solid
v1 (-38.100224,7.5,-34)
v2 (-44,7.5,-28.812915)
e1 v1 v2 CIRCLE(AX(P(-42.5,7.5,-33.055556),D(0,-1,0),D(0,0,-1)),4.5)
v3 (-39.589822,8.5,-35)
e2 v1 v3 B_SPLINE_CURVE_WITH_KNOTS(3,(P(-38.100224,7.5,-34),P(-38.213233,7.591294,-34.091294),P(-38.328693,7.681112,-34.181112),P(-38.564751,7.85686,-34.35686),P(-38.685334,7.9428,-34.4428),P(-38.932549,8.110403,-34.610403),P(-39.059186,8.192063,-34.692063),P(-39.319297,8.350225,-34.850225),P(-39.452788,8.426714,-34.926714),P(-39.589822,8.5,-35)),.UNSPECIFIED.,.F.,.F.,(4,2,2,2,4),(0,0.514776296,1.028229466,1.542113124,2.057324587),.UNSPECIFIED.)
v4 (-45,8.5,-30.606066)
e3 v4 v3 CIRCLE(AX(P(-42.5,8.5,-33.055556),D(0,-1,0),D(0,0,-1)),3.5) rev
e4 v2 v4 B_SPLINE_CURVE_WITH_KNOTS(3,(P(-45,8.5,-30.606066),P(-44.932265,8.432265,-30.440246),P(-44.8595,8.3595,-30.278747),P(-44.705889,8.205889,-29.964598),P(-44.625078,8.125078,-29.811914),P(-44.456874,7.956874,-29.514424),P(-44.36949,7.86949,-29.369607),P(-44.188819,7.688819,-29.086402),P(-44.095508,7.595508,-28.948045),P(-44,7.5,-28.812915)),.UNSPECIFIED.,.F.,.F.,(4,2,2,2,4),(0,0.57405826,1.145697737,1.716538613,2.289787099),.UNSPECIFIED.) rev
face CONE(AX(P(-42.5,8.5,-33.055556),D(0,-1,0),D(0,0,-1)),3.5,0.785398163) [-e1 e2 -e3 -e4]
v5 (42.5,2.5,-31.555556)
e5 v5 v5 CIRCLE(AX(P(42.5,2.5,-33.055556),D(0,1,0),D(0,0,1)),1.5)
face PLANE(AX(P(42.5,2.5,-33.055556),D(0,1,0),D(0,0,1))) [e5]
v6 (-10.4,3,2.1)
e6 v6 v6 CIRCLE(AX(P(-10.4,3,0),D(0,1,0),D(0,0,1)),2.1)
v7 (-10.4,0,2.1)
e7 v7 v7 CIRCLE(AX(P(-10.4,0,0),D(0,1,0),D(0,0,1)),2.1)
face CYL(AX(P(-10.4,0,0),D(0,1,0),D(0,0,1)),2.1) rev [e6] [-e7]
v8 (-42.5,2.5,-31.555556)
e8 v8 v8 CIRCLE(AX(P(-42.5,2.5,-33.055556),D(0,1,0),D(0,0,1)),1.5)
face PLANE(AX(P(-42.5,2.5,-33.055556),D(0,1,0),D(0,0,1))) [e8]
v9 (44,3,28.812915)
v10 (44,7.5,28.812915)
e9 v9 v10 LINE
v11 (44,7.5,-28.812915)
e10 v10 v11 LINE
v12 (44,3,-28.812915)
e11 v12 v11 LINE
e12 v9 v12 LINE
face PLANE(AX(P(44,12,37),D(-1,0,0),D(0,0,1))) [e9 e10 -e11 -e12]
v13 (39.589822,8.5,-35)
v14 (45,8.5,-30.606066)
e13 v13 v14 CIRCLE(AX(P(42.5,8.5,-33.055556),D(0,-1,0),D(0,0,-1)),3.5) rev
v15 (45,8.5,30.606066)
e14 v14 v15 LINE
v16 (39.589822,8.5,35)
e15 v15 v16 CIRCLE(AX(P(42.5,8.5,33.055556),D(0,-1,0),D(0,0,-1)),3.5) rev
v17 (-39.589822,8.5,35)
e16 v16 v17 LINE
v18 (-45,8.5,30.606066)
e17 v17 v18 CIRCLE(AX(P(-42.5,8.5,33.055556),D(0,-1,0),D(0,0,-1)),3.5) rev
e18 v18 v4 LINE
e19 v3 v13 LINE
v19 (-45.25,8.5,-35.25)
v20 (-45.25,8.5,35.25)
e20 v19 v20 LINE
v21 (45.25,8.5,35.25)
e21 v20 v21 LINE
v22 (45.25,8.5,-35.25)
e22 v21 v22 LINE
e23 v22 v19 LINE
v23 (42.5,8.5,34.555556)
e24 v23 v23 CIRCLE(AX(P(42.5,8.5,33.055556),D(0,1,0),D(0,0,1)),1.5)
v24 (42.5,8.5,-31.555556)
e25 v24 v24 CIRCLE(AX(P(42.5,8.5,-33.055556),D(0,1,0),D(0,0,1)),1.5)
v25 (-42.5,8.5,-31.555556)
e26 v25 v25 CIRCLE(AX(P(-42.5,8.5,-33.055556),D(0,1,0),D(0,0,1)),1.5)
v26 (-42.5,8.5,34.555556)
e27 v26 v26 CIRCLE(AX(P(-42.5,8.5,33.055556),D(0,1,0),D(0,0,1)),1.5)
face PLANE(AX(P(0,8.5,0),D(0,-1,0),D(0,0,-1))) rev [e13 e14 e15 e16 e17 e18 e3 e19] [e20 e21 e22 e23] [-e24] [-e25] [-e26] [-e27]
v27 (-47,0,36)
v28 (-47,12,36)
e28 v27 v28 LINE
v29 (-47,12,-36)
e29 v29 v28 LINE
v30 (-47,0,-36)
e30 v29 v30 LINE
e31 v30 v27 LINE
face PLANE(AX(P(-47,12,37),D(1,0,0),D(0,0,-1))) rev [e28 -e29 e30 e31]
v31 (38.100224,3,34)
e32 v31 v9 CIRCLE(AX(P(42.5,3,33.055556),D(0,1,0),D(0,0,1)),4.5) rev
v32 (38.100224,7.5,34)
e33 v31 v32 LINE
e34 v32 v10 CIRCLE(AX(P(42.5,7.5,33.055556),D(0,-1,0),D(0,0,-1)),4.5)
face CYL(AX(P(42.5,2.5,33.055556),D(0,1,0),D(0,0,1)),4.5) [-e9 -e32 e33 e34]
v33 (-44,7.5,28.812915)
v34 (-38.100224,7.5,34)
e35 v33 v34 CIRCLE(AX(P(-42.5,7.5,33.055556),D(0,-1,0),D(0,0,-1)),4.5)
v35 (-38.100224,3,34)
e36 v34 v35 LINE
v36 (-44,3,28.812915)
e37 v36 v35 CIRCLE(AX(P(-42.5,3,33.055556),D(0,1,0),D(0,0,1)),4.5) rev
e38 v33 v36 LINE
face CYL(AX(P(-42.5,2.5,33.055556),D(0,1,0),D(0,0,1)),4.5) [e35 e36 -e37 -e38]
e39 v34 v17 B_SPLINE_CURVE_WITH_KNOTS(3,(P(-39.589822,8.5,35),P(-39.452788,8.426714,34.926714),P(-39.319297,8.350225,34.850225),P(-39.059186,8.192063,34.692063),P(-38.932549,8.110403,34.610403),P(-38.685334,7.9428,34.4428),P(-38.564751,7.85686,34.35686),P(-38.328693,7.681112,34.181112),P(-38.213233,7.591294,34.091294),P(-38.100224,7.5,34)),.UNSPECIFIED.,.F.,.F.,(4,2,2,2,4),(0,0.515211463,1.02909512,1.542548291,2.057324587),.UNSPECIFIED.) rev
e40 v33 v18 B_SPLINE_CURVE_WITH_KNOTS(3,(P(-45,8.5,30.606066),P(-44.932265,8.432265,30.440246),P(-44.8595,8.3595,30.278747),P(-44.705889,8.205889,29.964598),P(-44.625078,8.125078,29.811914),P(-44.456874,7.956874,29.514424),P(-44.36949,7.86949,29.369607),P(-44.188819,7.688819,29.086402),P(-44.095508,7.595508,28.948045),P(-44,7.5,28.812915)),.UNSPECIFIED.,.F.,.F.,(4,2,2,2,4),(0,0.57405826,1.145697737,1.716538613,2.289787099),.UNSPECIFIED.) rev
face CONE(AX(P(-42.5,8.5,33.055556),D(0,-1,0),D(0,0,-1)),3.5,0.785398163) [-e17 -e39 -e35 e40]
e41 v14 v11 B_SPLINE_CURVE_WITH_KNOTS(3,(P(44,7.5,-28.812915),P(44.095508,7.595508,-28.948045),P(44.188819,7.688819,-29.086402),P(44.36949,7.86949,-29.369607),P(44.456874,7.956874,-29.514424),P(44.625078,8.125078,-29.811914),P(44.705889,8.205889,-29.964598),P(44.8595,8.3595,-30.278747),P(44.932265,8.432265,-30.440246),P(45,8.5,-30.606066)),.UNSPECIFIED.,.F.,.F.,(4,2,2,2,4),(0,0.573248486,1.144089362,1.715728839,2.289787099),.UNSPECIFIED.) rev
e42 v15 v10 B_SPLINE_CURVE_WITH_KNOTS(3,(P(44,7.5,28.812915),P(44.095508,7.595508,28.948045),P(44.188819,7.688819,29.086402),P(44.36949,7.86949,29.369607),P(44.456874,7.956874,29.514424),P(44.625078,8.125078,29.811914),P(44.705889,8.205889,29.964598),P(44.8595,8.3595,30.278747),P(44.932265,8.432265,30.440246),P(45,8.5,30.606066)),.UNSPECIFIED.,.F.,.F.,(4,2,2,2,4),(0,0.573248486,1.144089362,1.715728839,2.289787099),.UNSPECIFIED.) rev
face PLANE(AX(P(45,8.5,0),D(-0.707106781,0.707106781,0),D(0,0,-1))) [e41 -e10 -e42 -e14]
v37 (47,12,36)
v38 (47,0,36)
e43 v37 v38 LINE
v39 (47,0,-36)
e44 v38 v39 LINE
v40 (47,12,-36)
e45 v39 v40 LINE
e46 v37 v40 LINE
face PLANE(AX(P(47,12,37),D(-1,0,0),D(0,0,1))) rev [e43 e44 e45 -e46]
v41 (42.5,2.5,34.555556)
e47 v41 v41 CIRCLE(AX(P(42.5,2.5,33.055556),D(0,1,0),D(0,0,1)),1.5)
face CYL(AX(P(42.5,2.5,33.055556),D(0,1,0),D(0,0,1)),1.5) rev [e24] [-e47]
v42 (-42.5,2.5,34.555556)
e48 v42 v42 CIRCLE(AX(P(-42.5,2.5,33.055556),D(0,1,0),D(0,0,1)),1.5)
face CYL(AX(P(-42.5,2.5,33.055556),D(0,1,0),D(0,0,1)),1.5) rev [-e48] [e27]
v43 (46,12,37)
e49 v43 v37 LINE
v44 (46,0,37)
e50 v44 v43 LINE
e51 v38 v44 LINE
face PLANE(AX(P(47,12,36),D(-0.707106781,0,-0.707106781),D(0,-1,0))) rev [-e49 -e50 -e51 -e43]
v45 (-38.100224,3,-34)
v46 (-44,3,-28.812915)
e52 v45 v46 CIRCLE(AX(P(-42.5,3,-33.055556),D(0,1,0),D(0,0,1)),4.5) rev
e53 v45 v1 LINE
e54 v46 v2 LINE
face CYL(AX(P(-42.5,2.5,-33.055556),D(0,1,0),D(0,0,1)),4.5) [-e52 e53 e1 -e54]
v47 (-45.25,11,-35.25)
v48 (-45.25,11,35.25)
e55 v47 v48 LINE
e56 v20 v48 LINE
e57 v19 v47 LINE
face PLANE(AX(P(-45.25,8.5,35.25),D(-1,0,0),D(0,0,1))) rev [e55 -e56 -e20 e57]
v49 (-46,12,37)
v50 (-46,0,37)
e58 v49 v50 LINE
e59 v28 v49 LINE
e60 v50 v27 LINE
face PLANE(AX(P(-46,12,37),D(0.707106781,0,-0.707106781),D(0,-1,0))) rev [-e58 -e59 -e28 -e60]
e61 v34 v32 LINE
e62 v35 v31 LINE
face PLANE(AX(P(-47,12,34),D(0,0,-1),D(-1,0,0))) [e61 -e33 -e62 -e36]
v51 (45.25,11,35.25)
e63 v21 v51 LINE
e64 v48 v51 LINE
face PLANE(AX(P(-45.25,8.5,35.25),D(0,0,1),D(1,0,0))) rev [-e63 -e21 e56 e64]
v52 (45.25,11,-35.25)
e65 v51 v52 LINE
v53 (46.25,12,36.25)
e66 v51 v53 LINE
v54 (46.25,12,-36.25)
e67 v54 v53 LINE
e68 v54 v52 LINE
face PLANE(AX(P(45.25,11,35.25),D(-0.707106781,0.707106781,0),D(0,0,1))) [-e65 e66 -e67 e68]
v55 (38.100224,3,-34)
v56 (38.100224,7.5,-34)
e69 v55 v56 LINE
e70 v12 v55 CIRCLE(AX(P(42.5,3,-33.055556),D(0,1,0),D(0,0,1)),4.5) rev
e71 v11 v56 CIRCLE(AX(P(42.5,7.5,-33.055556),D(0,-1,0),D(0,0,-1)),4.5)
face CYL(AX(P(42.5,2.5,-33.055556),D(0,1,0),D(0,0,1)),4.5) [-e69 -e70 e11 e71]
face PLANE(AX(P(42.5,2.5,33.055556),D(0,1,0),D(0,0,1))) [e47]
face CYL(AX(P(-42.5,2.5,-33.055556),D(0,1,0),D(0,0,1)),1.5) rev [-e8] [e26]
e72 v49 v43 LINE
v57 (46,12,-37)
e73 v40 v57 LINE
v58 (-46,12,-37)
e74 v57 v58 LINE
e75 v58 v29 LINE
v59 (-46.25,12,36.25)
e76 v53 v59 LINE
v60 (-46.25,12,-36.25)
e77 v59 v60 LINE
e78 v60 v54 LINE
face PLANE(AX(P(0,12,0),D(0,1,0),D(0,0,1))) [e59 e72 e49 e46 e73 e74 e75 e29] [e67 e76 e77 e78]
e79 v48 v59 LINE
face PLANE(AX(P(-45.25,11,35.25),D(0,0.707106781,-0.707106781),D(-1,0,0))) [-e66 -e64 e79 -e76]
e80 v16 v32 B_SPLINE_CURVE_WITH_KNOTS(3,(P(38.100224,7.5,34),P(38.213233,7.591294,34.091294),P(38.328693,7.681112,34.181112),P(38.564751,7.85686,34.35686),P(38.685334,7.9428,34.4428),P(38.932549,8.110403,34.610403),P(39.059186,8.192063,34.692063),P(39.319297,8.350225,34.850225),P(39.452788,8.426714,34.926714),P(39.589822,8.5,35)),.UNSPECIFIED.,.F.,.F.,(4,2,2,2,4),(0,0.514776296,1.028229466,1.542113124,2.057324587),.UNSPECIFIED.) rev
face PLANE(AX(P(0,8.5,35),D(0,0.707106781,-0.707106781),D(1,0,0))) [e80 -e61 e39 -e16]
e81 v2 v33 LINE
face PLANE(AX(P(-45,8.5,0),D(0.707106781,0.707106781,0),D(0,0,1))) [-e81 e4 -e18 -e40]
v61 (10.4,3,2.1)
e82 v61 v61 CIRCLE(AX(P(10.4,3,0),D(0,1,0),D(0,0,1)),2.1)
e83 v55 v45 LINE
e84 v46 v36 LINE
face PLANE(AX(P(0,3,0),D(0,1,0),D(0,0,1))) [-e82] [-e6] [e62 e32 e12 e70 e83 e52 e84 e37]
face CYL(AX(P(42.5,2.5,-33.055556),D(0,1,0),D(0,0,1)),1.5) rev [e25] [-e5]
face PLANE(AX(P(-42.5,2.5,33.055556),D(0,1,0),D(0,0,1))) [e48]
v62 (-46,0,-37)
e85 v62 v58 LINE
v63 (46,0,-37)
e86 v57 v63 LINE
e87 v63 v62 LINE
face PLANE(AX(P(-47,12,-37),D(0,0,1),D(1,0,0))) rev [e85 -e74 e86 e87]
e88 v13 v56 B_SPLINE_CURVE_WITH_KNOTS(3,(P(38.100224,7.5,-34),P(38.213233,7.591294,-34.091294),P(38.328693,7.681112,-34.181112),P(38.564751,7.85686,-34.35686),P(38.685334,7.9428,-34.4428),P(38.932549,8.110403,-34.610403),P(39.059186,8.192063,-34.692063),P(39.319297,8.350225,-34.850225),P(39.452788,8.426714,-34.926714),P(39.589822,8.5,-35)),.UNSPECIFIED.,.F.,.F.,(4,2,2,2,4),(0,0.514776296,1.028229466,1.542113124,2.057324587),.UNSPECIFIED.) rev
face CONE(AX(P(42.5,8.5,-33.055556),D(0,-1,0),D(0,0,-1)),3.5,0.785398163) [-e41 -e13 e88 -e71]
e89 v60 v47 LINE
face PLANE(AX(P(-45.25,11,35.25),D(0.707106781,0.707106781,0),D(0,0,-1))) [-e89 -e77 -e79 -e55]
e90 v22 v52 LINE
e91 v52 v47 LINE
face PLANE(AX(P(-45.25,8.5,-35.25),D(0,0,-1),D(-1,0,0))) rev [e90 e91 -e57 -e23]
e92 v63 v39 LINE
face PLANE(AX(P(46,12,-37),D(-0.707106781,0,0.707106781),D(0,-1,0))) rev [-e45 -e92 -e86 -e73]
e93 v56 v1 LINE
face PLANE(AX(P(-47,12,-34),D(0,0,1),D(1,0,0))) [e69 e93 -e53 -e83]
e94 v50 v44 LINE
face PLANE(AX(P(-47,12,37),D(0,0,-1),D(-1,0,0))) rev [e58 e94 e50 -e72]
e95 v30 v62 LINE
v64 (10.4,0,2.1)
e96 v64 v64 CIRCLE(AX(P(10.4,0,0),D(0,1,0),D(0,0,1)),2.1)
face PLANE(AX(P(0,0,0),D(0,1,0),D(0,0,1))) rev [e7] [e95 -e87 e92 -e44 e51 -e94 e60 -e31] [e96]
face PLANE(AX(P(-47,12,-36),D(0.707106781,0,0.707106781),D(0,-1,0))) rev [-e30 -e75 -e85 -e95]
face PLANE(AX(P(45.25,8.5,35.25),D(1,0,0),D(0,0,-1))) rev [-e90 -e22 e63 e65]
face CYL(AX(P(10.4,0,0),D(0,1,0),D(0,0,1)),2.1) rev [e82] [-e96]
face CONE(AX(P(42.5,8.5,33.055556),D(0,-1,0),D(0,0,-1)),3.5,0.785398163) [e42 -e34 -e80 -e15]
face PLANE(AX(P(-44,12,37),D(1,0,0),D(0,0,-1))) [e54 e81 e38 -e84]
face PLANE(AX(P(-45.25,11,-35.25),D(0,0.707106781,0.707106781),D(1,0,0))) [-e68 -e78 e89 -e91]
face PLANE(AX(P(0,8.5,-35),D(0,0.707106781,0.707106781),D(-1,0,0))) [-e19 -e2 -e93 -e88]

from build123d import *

# Parameters (mm, degrees)
SKETCH1_W           = 94
SKETCH1_H           = 74
BOSS_EXTRUDE1_DEPTH = 12
SKETCH2_W           = 90.5
SKETCH2_H           = 70.5
CUT_EXTRUDE1_DEPTH  = 3.5
SKETCH3_R           = 1.5
CUT_EXTRUDE2_DEPTH  = 6
SHELL1_START        = 3
SHELL1_DEPTH        = 5.5
CHAMFER1_SIZE       = 1
CHAMFER2_SIZE       = 1
CHAMFER3_SIZE       = 1
SKETCH4_R           = 2.1
CUT_EXTRUDE3_DEPTH  = 61.489668539


# Read off the part's stored shape, not the designer's step: Shell1
with BuildPart() as part:
    # Sketch1 → Boss-Extrude1 (new body)
    with BuildSketch(Plane(origin=(0, 0, 0), x_dir=(1, 0, 0), z_dir=(0, 1, 0))):
        Rectangle(SKETCH1_W, SKETCH1_H)
    extrude(amount=BOSS_EXTRUDE1_DEPTH)

    # Sketch2 → Cut-Extrude1 (cut)
    with BuildSketch(Plane(origin=(0, 12, 0), x_dir=(1, 0, 0), z_dir=(0, 1, 0))):
        Rectangle(SKETCH2_W, SKETCH2_H)
    extrude(amount=-CUT_EXTRUDE1_DEPTH, mode=Mode.SUBTRACT)

    # Sketch3 → Cut-Extrude2 (cut)
    with BuildSketch(Plane(origin=(0, 8.5, 0), x_dir=(1, 0, 0), z_dir=(0, 1, 0))):
        with Locations(Location((-42.5, 33.055555556, 0), (0, 0, 270))):
            Circle(SKETCH3_R)
        with Locations(Location((42.5, 33.055555556, 0), (0, 0, 270))):
            Circle(SKETCH3_R)
        with Locations(Location((42.5, -33.055555556, 0), (0, 0, 270))):
            Circle(SKETCH3_R)
        with Locations(Location((-42.5, -33.055555556, 0), (0, 0, 270))):
            Circle(SKETCH3_R)
    extrude(amount=-CUT_EXTRUDE2_DEPTH, mode=Mode.SUBTRACT)

    # Shell1 outline → Shell1 (cut)
    with BuildSketch(Plane(origin=(0, 0, 0), x_dir=(1, 0, 0), z_dir=(0, 1, 0)).offset(SHELL1_START)):
        with BuildLine():
            Line((-38.100224473, -34), (38.100224473, -34))
            ThreePointArc((38.100224473, -34), (39.528697665, -29.67600493), (44, -28.812914868))
            Line((44, -28.812914868), (44, 28.812914868))
            ThreePointArc((44, 28.812914868), (39.528697665, 29.67600493), (38.100224473, 34))
            Line((38.100224473, 34), (-38.100224473, 34))
            ThreePointArc((-38.100224473, 34), (-39.528697665, 29.67600493), (-44, 28.812914868))
            Line((-44, 28.812914868), (-44, -28.812914868))
            ThreePointArc((-44, -28.812914868), (-39.528697665, -29.67600493), (-38.100224473, -34))
        make_face()
    extrude(amount=SHELL1_DEPTH, mode=Mode.SUBTRACT)

    # Chamfer1
    chamfer1_edges = [part.edges().sort_by_distance(p)[0] for p in [
        (45.25, 12, 0),
        (0, 12, -35.25),
        (-45.25, 12, 0),
        (0, 12, 35.25),
    ]]
    chamfer(chamfer1_edges, length=CHAMFER1_SIZE)

    # Chamfer2
    chamfer2_edges = [part.edges().sort_by_distance(p)[0] for p in [
        (0, 8.5, 34),
        (44, 8.5, 0),
        (0, 8.5, -34),
        (-44, 8.5, 0),
        (-39.528697665, 8.5, -29.67600493),
        (39.528697665, 8.5, -29.67600493),
        (39.528697665, 8.5, 29.67600493),
        (-39.528697665, 8.5, 29.67600493),
    ]]
    chamfer(chamfer2_edges, length=CHAMFER2_SIZE)

    # Chamfer3
    chamfer3_edges = [part.edges().sort_by_distance(p)[0] for p in [
        (-47, 6, 37),
        (-47, 6, -37),
        (47, 6, -37),
        (47, 6, 37),
    ]]
    chamfer(chamfer3_edges, length=CHAMFER3_SIZE)

    # Sketch4 → Cut-Extrude3 (cut, through all)
    with BuildSketch(Plane(origin=(0, 3, 0), x_dir=(1, 0, 0), z_dir=(0, 1, 0))):
        with Locations(Location((-10.4, 0, 0), (0, 0, 270))):
            Circle(SKETCH4_R)
        with Locations(Location((10.4, 0, 0), (0, 0, 270))):
            Circle(SKETCH4_R)
    extrude(amount=-CUT_EXTRUDE3_DEPTH, mode=Mode.SUBTRACT)


solid = part.part
